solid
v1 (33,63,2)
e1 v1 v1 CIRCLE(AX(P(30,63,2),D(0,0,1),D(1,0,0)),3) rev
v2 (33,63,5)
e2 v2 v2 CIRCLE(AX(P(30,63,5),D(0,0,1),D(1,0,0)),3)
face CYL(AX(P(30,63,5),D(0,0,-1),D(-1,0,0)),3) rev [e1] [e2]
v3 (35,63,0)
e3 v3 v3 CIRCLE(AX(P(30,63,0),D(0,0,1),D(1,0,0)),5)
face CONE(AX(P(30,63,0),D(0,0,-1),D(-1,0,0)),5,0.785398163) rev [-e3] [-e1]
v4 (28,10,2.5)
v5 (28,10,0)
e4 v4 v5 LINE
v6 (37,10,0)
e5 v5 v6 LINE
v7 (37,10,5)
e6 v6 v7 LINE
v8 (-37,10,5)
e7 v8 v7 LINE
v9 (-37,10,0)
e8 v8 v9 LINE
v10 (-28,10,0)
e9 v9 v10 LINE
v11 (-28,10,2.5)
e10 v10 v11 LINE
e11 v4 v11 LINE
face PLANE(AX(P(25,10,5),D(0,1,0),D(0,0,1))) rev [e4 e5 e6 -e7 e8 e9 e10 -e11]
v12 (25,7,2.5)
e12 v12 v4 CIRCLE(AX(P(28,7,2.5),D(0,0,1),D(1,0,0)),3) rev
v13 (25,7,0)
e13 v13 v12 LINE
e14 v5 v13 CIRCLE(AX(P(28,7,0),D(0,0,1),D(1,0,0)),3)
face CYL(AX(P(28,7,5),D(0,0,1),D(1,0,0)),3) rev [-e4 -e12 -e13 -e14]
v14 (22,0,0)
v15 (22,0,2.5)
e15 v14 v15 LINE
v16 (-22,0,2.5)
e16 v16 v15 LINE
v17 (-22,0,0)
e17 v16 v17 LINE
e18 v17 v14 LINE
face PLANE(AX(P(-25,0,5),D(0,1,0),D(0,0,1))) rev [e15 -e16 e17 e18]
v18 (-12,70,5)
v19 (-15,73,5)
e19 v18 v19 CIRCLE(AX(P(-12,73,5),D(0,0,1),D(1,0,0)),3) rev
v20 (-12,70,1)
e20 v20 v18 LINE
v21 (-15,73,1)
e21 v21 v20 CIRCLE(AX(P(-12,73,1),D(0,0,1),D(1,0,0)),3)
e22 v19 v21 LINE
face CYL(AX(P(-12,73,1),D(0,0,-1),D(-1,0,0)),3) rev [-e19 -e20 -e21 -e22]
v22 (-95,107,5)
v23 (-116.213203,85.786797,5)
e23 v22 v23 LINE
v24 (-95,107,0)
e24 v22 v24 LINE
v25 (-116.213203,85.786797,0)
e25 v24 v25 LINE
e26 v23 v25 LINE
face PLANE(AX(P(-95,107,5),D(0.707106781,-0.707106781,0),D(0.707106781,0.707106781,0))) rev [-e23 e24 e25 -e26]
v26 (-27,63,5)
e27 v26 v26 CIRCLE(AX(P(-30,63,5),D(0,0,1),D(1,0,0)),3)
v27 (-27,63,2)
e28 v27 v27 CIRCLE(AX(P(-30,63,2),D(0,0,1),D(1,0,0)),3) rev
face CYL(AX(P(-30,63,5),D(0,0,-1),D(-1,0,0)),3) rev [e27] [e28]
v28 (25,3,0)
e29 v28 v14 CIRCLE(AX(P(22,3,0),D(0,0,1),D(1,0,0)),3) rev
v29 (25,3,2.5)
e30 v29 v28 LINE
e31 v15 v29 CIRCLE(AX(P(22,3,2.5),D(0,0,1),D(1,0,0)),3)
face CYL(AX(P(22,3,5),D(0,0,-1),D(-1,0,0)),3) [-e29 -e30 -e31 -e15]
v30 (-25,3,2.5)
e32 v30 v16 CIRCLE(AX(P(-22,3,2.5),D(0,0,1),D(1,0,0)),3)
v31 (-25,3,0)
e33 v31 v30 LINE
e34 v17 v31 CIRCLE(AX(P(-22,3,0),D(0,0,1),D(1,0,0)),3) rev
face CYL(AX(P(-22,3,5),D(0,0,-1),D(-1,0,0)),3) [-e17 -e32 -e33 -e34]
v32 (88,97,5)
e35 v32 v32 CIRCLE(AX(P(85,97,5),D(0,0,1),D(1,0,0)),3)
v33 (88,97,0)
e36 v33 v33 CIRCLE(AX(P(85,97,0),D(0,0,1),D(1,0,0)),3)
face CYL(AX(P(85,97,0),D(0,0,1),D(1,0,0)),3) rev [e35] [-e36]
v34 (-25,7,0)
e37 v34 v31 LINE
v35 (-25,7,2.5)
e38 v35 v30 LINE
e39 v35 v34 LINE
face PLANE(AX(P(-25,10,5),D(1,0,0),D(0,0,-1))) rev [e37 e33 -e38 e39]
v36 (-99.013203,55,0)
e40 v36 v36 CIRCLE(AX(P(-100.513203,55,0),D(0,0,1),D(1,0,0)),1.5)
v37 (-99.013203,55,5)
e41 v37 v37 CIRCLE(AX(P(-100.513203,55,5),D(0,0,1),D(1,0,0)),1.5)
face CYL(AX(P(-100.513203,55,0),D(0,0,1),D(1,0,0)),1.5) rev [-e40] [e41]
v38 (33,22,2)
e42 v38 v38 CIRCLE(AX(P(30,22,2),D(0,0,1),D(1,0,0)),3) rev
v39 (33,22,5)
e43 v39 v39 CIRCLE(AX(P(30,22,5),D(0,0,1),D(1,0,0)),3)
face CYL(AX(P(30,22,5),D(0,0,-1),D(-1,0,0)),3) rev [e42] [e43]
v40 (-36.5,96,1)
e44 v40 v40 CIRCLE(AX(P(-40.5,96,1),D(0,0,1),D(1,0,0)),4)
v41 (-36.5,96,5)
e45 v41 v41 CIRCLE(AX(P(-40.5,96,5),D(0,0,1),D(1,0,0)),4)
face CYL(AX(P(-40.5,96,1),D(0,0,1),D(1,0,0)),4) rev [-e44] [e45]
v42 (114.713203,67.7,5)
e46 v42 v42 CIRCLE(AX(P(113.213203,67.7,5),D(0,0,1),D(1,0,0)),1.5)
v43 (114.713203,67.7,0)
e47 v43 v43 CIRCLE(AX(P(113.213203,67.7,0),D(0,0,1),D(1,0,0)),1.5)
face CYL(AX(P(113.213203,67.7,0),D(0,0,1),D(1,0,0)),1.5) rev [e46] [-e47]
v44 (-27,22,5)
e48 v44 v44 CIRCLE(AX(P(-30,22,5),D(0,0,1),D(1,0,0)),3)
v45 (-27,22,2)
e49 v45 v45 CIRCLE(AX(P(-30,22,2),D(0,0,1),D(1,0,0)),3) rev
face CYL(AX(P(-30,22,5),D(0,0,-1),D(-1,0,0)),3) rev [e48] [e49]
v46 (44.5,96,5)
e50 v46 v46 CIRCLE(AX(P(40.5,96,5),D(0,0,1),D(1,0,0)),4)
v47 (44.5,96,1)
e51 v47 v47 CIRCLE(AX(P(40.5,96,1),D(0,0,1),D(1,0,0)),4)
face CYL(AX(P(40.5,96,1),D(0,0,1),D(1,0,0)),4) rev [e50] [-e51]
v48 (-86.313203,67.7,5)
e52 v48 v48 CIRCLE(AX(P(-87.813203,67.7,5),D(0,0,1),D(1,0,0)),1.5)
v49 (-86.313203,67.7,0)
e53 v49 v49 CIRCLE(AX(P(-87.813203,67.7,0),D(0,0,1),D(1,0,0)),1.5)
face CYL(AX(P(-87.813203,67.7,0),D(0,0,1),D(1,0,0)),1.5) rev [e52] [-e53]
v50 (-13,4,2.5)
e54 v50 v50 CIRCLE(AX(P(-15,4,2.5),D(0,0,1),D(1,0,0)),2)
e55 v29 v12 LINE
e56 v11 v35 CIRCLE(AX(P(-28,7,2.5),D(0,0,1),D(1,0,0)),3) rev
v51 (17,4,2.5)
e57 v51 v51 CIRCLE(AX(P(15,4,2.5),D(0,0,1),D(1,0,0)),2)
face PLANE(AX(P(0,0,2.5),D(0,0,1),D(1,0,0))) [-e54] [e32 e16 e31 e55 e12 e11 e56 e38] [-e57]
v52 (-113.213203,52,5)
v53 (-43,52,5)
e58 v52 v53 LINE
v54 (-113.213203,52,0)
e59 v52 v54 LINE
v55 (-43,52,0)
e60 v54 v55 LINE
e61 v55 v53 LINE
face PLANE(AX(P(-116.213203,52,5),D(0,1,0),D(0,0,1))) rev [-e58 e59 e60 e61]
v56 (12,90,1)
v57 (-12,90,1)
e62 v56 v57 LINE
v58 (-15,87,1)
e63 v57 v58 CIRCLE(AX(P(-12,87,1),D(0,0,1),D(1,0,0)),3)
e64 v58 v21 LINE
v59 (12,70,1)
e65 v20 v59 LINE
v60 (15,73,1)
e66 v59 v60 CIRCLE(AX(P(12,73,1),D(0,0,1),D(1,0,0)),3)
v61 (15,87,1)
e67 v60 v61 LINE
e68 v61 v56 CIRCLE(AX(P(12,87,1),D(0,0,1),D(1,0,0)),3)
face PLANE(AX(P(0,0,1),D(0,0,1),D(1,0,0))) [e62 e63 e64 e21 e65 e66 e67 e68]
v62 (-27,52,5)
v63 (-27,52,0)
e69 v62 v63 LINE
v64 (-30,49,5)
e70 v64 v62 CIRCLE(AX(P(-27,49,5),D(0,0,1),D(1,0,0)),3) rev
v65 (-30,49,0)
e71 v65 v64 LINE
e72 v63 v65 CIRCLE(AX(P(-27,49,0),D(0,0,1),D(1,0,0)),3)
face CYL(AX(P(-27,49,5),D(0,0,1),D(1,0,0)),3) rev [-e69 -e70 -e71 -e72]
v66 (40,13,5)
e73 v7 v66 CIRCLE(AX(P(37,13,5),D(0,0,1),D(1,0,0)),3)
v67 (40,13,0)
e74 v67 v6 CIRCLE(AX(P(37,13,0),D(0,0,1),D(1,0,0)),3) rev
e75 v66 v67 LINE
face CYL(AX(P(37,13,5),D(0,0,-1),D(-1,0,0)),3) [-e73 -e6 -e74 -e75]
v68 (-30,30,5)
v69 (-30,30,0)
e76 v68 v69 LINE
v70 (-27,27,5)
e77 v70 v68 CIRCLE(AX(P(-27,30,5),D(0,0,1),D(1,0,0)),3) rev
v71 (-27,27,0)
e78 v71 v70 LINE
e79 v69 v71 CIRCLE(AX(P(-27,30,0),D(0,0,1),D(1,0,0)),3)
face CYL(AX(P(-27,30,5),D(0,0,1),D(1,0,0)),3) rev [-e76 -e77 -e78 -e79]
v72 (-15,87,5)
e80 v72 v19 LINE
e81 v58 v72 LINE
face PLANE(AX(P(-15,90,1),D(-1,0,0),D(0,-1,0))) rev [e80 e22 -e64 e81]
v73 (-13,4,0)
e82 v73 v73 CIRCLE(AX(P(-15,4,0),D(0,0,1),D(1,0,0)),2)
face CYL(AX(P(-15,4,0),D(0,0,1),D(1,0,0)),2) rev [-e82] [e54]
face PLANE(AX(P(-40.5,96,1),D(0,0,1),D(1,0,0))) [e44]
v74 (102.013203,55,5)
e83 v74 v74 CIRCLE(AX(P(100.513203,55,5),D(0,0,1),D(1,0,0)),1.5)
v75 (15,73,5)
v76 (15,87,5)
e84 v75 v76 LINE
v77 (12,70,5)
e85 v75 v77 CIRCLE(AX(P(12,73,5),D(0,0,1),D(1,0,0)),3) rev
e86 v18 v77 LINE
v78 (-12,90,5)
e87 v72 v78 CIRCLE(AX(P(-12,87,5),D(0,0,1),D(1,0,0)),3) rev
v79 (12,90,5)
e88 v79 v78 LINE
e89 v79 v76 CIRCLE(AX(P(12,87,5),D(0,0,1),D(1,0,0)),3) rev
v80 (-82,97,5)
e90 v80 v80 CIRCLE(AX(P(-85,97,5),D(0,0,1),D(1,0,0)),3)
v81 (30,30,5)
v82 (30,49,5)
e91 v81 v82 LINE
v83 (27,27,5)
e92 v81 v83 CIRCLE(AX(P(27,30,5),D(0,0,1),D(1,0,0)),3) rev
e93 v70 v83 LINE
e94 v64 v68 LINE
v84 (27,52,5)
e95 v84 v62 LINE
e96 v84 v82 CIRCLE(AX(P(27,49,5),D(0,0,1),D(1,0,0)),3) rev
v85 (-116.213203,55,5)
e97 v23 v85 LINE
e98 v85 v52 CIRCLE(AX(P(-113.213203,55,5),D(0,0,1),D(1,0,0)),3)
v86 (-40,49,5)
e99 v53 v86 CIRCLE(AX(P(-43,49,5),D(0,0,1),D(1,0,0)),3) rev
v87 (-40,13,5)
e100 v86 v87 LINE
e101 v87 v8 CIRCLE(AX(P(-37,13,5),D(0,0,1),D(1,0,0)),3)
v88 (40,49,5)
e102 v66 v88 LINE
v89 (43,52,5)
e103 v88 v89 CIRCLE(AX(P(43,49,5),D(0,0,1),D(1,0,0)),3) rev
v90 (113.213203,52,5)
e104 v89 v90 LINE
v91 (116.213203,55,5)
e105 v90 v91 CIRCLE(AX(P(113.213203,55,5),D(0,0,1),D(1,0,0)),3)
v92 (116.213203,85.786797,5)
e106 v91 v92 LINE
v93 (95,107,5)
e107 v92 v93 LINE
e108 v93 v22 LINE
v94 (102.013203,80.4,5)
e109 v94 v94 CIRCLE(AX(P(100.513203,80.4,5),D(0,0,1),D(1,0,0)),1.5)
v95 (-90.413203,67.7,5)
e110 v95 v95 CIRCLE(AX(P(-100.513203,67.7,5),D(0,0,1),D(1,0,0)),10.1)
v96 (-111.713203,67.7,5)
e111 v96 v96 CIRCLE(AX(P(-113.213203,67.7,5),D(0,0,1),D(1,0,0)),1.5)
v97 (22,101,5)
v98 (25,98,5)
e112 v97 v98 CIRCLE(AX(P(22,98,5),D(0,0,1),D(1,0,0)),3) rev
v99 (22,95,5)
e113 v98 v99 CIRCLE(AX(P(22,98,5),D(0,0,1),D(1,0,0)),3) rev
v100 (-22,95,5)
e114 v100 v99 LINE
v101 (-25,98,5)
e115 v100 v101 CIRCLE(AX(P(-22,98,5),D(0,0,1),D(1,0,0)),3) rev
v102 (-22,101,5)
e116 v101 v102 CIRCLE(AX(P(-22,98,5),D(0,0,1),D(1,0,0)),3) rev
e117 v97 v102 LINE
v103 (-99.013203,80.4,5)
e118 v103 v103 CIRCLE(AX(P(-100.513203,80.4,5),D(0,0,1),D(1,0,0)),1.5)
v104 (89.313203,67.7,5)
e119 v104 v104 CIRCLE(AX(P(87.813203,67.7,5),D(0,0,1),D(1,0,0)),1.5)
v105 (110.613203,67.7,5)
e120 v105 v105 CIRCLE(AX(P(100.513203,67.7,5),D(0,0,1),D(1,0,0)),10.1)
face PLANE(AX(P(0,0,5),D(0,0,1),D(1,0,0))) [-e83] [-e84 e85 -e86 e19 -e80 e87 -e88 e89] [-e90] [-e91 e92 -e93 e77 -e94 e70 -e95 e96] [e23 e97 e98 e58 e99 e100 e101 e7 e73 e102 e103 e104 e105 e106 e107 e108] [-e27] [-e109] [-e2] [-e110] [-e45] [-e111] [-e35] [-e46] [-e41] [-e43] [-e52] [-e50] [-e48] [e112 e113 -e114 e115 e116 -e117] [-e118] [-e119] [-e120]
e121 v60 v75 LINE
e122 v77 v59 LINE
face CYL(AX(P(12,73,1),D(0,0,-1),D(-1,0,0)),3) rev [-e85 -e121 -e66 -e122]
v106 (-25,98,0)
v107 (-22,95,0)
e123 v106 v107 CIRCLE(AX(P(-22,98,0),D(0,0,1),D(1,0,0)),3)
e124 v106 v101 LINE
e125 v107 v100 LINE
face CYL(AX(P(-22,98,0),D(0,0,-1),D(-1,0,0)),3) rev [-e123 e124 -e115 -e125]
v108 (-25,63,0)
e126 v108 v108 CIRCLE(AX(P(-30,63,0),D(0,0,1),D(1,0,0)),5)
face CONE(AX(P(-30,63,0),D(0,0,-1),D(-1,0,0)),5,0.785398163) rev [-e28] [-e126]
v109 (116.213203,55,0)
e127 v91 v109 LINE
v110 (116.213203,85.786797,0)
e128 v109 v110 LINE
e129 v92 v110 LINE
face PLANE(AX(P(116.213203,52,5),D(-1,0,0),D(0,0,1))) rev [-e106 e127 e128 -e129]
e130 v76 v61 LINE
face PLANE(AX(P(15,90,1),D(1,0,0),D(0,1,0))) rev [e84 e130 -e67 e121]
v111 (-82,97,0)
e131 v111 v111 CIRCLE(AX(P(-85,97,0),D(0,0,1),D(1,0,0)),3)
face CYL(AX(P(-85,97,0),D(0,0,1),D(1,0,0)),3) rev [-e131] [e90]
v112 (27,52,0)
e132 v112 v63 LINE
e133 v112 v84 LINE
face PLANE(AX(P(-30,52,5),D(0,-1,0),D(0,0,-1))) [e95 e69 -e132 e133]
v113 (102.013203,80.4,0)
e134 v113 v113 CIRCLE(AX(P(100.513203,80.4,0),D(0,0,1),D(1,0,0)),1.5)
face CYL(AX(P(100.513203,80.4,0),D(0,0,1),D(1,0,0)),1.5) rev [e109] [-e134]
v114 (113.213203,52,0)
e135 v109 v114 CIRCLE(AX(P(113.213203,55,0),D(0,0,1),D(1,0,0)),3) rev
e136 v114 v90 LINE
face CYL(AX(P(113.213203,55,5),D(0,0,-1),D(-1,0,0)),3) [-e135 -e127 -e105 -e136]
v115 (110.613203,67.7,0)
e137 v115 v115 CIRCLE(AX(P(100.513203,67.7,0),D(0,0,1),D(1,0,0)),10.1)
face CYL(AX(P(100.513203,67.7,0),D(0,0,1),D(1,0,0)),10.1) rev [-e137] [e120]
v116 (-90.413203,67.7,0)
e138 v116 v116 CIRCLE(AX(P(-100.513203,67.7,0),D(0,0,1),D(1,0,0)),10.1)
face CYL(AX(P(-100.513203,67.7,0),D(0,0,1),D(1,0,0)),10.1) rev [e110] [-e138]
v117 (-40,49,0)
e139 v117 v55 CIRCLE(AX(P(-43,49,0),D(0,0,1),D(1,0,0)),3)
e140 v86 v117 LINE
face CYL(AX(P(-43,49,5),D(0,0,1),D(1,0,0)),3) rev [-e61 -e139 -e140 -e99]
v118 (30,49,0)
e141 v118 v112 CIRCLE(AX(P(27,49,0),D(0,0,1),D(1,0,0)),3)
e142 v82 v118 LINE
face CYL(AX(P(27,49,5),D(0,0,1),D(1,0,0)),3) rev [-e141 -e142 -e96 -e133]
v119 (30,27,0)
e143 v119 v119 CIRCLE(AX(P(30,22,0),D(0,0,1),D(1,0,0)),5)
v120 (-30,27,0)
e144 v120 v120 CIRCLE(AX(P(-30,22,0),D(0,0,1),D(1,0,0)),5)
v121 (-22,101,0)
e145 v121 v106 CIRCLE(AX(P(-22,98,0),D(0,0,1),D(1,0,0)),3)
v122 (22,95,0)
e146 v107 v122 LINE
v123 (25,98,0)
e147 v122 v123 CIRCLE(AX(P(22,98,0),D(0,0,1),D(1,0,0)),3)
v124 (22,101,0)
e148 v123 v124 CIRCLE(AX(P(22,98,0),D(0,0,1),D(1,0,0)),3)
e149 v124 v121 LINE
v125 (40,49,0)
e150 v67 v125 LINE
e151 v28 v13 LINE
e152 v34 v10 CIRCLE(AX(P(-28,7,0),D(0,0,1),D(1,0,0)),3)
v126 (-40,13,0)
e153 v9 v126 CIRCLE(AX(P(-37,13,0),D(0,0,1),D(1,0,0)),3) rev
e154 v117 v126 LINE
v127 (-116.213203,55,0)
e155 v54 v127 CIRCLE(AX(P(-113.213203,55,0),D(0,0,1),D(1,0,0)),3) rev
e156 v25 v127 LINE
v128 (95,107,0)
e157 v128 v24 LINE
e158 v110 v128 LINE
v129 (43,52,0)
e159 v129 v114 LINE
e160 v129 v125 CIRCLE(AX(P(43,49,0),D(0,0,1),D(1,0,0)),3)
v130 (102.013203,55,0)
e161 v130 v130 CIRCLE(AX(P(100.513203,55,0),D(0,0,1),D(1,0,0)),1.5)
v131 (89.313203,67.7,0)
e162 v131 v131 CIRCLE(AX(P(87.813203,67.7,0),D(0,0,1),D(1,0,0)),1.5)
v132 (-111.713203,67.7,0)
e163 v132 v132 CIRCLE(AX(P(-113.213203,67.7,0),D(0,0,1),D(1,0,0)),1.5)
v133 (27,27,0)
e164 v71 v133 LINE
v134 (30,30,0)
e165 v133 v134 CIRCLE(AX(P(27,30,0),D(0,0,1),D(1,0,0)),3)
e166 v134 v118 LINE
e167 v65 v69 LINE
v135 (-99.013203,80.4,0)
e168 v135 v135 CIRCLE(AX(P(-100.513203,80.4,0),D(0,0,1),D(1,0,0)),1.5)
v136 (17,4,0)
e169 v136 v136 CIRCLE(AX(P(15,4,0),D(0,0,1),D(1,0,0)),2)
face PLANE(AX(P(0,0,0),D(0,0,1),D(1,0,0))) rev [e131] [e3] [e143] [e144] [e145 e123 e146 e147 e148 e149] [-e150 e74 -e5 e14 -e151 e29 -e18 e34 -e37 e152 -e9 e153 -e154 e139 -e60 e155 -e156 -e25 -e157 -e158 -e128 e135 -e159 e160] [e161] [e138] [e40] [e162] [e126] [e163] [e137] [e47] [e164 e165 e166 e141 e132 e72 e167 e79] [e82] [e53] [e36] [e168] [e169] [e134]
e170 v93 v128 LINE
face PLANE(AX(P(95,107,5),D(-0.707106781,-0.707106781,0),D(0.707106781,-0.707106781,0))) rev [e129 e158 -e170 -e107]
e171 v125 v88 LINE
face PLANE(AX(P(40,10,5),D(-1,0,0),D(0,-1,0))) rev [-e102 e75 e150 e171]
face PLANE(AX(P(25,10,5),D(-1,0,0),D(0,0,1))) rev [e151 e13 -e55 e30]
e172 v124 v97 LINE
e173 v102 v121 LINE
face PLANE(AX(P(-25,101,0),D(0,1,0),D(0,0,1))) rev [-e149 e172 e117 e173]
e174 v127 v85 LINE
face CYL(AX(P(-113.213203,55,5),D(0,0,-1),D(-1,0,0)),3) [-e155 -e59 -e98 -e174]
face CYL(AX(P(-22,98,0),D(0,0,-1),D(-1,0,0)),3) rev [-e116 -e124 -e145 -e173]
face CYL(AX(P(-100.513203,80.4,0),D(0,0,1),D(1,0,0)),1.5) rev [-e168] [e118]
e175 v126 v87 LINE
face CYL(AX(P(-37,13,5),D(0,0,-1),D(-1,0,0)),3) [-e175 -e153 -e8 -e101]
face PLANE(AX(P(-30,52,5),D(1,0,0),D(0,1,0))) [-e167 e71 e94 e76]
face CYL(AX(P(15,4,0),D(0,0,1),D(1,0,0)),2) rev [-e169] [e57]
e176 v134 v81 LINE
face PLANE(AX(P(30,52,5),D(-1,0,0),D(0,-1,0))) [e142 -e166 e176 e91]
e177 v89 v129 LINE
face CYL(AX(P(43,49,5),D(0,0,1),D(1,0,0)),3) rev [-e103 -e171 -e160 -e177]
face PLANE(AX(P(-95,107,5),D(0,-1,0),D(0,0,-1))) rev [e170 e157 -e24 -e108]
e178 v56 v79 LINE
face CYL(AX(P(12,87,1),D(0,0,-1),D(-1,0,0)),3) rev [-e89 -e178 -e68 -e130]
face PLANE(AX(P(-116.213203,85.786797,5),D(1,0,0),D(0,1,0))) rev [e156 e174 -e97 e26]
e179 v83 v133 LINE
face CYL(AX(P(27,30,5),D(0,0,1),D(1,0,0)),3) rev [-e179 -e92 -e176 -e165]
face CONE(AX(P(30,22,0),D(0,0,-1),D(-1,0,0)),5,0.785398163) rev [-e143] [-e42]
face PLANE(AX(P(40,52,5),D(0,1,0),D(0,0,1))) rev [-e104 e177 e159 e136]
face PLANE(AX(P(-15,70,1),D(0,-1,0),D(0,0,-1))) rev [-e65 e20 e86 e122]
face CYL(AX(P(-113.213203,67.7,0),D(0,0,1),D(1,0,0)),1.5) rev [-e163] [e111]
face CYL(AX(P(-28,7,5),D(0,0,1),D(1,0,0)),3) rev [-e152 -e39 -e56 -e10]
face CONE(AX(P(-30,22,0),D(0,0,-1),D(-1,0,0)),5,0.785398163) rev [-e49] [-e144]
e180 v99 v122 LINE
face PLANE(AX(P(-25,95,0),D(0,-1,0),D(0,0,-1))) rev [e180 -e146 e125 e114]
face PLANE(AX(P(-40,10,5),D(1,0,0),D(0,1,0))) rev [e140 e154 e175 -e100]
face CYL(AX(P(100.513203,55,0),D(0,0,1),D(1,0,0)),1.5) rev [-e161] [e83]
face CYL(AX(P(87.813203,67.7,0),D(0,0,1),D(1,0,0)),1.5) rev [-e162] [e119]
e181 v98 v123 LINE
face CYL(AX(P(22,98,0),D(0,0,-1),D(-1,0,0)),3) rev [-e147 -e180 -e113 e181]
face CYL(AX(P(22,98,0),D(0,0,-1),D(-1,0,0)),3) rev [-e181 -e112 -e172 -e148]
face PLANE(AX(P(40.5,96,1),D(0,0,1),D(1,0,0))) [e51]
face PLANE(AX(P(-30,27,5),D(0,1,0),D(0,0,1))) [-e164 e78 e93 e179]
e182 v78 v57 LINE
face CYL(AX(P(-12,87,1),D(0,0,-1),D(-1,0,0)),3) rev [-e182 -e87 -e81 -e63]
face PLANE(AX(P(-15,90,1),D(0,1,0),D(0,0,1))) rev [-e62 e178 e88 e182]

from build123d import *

# Parameters (mm, degrees)
ESQUISSE2_R             = 3
ESQUISSE2_W             = 60
ESQUISSE2_H             = 25
BOSS_EXTRU_2_DEPTH      = 5
ESQUISSE3_W             = 50
ESQUISSE3_H             = 10
ENL_V_MAT_EXTRU_1_DEPTH = 2.5
ESQUISSE4_W             = 50
ESQUISSE4_H             = 6
ENL_V_MAT_EXTRU_2_DEPTH = 159.049070395
ESQUISSE5_W             = 30
ESQUISSE5_H             = 20
ENL_V_MAT_EXTRU_3_DEPTH = 4
CHANFREIN1_SIZE         = 2
ESQUISSE6_R             = 4
ENL_V_MAT_EXTRU_4_DEPTH = 4
ESQUISSE7_R             = 3
ENL_V_MAT_EXTRU_5_DEPTH = 159.049070395
ESQUISSE8_R             = 2
ENL_V_MAT_EXTRU_6_DEPTH = 158.989742239
CONG_2_R                = 3
ESQUISSE9_R             = 10.1
ESQUISSE9_R_2           = 1.5
ENL_V_MAT_EXTRU_7_DEPTH = 159.049070395


with BuildPart() as part:
    # Esquisse2 → Boss.-Extru.2 (new body)
    with BuildSketch(Plane.XY):
        Polygon((-40, 10), (-25, 10), (-25, 0), (25, 0), (25, 10), (40, 10), (40, 52), (116.213203436, 52), (116.213203436, 85.786796564), (95, 107), (-95, 107), (-116.213203436, 85.786796564), (-116.213203436, 52), (-40, 52), align=None)
        with Locations((-30, 63)):
            Circle(ESQUISSE2_R, mode=Mode.SUBTRACT)
        with Locations((-30, 22)):
            Circle(ESQUISSE2_R, mode=Mode.SUBTRACT)
        with Locations((30, 22)):
            Circle(ESQUISSE2_R, mode=Mode.SUBTRACT)
        with Locations((30, 63)):
            Circle(ESQUISSE2_R, mode=Mode.SUBTRACT)
        with Locations((0, 39.5)):
            Rectangle(ESQUISSE2_W, ESQUISSE2_H, mode=Mode.SUBTRACT)
    extrude(amount=BOSS_EXTRU_2_DEPTH)

    # Esquisse3 → Enlèv. mat.-Extru.1 (cut)
    with BuildSketch(Plane.XY.offset(5)):
        with Locations((0, 5)):
            Rectangle(ESQUISSE3_W, ESQUISSE3_H)
    extrude(amount=-ENL_V_MAT_EXTRU_1_DEPTH, mode=Mode.SUBTRACT)

    # Esquisse4 → Enlèv. mat.-Extru.2 (cut, through all)
    with BuildSketch(Plane.XY.offset(5)):
        with Locations((0, 98)):
            Rectangle(ESQUISSE4_W, ESQUISSE4_H)
    extrude(amount=-ENL_V_MAT_EXTRU_2_DEPTH, mode=Mode.SUBTRACT)

    # Esquisse5 → Enlèv. mat.-Extru.3 (cut)
    with BuildSketch(Plane.XY.offset(5)):
        with Locations((0, 80)):
            Rectangle(ESQUISSE5_W, ESQUISSE5_H)
    extrude(amount=-ENL_V_MAT_EXTRU_3_DEPTH, mode=Mode.SUBTRACT)

    # Chanfrein1
    chanfrein1_edges = [part.edges().sort_by_distance(p)[0] for p in [
        (-33, 63, 0),
        (-33, 22, 0),
        (27, 22, 0),
        (27, 63, 0),
    ]]
    chamfer(chanfrein1_edges, length=CHANFREIN1_SIZE - 0.0001)  # a hair under: the kernel refuses the full size

    # Esquisse6 → Enlèv. mat.-Extru.4 (cut)
    with BuildSketch(Plane.XY.offset(5)):
        with Locations((-40.5, 96)):
            Circle(ESQUISSE6_R)
        with Locations((40.5, 96)):
            Circle(ESQUISSE6_R)
    extrude(amount=-ENL_V_MAT_EXTRU_4_DEPTH, mode=Mode.SUBTRACT)

    # Esquisse7 → Enlèv. mat.-Extru.5 (cut, through all)
    with BuildSketch(Plane.XY.offset(5)):
        with Locations((-85, 97)):
            Circle(ESQUISSE7_R)
        with Locations((85, 97)):
            Circle(ESQUISSE7_R)
    extrude(amount=-ENL_V_MAT_EXTRU_5_DEPTH, mode=Mode.SUBTRACT)

    # Esquisse8 → Enlèv. mat.-Extru.6 (cut, through all)
    with BuildSketch(Plane.XY.offset(2.5)):
        with Locations((-15, 4)):
            Circle(ESQUISSE8_R)
        with Locations((15, 4)):
            Circle(ESQUISSE8_R)
    extrude(amount=-ENL_V_MAT_EXTRU_6_DEPTH, mode=Mode.SUBTRACT)

    # Congé2
    cong_2_edges = [part.edges().sort_by_distance(p)[0] for p in [
        (30, 52, 2.5),
        (-30, 27, 2.5),
        (30, 27, 2.5),
        (-25, 95, 2.5),
        (25, 95, 2.5),
        (25, 101, 2.5),
        (-25, 101, 2.5),
        (-30, 52, 2.5),
        (116.213203436, 52, 2.5),
        (-40, 10, 2.5),
        (40, 10, 2.5),
        (-116.213203436, 52, 2.5),
        (-15, 90, 3),
        (-15, 70, 3),
        (15, 70, 3),
        (15, 90, 3),
        (40, 52, 2.5),
        (-40, 52, 2.5),
        (-25, 10, 1.25),
        (25, 10, 1.25),
        (25, 0, 1.25),
        (-25, 0, 1.25),
    ]]
    fillet(cong_2_edges, radius=CONG_2_R - 0.0001)  # a hair under: the kernel refuses the full size

    # Esquisse9 → Enlèv. mat.-Extru.7 (cut, through all)
    with BuildSketch(Plane.XY.offset(5)):
        with Locations((100.513203436, 67.7)):
            Circle(ESQUISSE9_R)
        with Locations((113.213203436, 67.7)):
            Circle(ESQUISSE9_R_2)
        with Locations((100.513203436, 80.4)):
            Circle(ESQUISSE9_R_2)
        with Locations((87.813203436, 67.7)):
            Circle(ESQUISSE9_R_2)
        with Locations((100.513203436, 55)):
            Circle(ESQUISSE9_R_2)
        with Locations((-100.513203436, 67.7)):
            Circle(ESQUISSE9_R)
        with Locations((-87.813203436, 67.7)):
            Circle(ESQUISSE9_R_2)
        with Locations((-100.513203436, 80.4)):
            Circle(ESQUISSE9_R_2)
        with Locations((-113.213203436, 67.7)):
            Circle(ESQUISSE9_R_2)
        with Locations((-100.513203436, 55)):
            Circle(ESQUISSE9_R_2)
    extrude(amount=-ENL_V_MAT_EXTRU_7_DEPTH, mode=Mode.SUBTRACT)


solid = part.part
